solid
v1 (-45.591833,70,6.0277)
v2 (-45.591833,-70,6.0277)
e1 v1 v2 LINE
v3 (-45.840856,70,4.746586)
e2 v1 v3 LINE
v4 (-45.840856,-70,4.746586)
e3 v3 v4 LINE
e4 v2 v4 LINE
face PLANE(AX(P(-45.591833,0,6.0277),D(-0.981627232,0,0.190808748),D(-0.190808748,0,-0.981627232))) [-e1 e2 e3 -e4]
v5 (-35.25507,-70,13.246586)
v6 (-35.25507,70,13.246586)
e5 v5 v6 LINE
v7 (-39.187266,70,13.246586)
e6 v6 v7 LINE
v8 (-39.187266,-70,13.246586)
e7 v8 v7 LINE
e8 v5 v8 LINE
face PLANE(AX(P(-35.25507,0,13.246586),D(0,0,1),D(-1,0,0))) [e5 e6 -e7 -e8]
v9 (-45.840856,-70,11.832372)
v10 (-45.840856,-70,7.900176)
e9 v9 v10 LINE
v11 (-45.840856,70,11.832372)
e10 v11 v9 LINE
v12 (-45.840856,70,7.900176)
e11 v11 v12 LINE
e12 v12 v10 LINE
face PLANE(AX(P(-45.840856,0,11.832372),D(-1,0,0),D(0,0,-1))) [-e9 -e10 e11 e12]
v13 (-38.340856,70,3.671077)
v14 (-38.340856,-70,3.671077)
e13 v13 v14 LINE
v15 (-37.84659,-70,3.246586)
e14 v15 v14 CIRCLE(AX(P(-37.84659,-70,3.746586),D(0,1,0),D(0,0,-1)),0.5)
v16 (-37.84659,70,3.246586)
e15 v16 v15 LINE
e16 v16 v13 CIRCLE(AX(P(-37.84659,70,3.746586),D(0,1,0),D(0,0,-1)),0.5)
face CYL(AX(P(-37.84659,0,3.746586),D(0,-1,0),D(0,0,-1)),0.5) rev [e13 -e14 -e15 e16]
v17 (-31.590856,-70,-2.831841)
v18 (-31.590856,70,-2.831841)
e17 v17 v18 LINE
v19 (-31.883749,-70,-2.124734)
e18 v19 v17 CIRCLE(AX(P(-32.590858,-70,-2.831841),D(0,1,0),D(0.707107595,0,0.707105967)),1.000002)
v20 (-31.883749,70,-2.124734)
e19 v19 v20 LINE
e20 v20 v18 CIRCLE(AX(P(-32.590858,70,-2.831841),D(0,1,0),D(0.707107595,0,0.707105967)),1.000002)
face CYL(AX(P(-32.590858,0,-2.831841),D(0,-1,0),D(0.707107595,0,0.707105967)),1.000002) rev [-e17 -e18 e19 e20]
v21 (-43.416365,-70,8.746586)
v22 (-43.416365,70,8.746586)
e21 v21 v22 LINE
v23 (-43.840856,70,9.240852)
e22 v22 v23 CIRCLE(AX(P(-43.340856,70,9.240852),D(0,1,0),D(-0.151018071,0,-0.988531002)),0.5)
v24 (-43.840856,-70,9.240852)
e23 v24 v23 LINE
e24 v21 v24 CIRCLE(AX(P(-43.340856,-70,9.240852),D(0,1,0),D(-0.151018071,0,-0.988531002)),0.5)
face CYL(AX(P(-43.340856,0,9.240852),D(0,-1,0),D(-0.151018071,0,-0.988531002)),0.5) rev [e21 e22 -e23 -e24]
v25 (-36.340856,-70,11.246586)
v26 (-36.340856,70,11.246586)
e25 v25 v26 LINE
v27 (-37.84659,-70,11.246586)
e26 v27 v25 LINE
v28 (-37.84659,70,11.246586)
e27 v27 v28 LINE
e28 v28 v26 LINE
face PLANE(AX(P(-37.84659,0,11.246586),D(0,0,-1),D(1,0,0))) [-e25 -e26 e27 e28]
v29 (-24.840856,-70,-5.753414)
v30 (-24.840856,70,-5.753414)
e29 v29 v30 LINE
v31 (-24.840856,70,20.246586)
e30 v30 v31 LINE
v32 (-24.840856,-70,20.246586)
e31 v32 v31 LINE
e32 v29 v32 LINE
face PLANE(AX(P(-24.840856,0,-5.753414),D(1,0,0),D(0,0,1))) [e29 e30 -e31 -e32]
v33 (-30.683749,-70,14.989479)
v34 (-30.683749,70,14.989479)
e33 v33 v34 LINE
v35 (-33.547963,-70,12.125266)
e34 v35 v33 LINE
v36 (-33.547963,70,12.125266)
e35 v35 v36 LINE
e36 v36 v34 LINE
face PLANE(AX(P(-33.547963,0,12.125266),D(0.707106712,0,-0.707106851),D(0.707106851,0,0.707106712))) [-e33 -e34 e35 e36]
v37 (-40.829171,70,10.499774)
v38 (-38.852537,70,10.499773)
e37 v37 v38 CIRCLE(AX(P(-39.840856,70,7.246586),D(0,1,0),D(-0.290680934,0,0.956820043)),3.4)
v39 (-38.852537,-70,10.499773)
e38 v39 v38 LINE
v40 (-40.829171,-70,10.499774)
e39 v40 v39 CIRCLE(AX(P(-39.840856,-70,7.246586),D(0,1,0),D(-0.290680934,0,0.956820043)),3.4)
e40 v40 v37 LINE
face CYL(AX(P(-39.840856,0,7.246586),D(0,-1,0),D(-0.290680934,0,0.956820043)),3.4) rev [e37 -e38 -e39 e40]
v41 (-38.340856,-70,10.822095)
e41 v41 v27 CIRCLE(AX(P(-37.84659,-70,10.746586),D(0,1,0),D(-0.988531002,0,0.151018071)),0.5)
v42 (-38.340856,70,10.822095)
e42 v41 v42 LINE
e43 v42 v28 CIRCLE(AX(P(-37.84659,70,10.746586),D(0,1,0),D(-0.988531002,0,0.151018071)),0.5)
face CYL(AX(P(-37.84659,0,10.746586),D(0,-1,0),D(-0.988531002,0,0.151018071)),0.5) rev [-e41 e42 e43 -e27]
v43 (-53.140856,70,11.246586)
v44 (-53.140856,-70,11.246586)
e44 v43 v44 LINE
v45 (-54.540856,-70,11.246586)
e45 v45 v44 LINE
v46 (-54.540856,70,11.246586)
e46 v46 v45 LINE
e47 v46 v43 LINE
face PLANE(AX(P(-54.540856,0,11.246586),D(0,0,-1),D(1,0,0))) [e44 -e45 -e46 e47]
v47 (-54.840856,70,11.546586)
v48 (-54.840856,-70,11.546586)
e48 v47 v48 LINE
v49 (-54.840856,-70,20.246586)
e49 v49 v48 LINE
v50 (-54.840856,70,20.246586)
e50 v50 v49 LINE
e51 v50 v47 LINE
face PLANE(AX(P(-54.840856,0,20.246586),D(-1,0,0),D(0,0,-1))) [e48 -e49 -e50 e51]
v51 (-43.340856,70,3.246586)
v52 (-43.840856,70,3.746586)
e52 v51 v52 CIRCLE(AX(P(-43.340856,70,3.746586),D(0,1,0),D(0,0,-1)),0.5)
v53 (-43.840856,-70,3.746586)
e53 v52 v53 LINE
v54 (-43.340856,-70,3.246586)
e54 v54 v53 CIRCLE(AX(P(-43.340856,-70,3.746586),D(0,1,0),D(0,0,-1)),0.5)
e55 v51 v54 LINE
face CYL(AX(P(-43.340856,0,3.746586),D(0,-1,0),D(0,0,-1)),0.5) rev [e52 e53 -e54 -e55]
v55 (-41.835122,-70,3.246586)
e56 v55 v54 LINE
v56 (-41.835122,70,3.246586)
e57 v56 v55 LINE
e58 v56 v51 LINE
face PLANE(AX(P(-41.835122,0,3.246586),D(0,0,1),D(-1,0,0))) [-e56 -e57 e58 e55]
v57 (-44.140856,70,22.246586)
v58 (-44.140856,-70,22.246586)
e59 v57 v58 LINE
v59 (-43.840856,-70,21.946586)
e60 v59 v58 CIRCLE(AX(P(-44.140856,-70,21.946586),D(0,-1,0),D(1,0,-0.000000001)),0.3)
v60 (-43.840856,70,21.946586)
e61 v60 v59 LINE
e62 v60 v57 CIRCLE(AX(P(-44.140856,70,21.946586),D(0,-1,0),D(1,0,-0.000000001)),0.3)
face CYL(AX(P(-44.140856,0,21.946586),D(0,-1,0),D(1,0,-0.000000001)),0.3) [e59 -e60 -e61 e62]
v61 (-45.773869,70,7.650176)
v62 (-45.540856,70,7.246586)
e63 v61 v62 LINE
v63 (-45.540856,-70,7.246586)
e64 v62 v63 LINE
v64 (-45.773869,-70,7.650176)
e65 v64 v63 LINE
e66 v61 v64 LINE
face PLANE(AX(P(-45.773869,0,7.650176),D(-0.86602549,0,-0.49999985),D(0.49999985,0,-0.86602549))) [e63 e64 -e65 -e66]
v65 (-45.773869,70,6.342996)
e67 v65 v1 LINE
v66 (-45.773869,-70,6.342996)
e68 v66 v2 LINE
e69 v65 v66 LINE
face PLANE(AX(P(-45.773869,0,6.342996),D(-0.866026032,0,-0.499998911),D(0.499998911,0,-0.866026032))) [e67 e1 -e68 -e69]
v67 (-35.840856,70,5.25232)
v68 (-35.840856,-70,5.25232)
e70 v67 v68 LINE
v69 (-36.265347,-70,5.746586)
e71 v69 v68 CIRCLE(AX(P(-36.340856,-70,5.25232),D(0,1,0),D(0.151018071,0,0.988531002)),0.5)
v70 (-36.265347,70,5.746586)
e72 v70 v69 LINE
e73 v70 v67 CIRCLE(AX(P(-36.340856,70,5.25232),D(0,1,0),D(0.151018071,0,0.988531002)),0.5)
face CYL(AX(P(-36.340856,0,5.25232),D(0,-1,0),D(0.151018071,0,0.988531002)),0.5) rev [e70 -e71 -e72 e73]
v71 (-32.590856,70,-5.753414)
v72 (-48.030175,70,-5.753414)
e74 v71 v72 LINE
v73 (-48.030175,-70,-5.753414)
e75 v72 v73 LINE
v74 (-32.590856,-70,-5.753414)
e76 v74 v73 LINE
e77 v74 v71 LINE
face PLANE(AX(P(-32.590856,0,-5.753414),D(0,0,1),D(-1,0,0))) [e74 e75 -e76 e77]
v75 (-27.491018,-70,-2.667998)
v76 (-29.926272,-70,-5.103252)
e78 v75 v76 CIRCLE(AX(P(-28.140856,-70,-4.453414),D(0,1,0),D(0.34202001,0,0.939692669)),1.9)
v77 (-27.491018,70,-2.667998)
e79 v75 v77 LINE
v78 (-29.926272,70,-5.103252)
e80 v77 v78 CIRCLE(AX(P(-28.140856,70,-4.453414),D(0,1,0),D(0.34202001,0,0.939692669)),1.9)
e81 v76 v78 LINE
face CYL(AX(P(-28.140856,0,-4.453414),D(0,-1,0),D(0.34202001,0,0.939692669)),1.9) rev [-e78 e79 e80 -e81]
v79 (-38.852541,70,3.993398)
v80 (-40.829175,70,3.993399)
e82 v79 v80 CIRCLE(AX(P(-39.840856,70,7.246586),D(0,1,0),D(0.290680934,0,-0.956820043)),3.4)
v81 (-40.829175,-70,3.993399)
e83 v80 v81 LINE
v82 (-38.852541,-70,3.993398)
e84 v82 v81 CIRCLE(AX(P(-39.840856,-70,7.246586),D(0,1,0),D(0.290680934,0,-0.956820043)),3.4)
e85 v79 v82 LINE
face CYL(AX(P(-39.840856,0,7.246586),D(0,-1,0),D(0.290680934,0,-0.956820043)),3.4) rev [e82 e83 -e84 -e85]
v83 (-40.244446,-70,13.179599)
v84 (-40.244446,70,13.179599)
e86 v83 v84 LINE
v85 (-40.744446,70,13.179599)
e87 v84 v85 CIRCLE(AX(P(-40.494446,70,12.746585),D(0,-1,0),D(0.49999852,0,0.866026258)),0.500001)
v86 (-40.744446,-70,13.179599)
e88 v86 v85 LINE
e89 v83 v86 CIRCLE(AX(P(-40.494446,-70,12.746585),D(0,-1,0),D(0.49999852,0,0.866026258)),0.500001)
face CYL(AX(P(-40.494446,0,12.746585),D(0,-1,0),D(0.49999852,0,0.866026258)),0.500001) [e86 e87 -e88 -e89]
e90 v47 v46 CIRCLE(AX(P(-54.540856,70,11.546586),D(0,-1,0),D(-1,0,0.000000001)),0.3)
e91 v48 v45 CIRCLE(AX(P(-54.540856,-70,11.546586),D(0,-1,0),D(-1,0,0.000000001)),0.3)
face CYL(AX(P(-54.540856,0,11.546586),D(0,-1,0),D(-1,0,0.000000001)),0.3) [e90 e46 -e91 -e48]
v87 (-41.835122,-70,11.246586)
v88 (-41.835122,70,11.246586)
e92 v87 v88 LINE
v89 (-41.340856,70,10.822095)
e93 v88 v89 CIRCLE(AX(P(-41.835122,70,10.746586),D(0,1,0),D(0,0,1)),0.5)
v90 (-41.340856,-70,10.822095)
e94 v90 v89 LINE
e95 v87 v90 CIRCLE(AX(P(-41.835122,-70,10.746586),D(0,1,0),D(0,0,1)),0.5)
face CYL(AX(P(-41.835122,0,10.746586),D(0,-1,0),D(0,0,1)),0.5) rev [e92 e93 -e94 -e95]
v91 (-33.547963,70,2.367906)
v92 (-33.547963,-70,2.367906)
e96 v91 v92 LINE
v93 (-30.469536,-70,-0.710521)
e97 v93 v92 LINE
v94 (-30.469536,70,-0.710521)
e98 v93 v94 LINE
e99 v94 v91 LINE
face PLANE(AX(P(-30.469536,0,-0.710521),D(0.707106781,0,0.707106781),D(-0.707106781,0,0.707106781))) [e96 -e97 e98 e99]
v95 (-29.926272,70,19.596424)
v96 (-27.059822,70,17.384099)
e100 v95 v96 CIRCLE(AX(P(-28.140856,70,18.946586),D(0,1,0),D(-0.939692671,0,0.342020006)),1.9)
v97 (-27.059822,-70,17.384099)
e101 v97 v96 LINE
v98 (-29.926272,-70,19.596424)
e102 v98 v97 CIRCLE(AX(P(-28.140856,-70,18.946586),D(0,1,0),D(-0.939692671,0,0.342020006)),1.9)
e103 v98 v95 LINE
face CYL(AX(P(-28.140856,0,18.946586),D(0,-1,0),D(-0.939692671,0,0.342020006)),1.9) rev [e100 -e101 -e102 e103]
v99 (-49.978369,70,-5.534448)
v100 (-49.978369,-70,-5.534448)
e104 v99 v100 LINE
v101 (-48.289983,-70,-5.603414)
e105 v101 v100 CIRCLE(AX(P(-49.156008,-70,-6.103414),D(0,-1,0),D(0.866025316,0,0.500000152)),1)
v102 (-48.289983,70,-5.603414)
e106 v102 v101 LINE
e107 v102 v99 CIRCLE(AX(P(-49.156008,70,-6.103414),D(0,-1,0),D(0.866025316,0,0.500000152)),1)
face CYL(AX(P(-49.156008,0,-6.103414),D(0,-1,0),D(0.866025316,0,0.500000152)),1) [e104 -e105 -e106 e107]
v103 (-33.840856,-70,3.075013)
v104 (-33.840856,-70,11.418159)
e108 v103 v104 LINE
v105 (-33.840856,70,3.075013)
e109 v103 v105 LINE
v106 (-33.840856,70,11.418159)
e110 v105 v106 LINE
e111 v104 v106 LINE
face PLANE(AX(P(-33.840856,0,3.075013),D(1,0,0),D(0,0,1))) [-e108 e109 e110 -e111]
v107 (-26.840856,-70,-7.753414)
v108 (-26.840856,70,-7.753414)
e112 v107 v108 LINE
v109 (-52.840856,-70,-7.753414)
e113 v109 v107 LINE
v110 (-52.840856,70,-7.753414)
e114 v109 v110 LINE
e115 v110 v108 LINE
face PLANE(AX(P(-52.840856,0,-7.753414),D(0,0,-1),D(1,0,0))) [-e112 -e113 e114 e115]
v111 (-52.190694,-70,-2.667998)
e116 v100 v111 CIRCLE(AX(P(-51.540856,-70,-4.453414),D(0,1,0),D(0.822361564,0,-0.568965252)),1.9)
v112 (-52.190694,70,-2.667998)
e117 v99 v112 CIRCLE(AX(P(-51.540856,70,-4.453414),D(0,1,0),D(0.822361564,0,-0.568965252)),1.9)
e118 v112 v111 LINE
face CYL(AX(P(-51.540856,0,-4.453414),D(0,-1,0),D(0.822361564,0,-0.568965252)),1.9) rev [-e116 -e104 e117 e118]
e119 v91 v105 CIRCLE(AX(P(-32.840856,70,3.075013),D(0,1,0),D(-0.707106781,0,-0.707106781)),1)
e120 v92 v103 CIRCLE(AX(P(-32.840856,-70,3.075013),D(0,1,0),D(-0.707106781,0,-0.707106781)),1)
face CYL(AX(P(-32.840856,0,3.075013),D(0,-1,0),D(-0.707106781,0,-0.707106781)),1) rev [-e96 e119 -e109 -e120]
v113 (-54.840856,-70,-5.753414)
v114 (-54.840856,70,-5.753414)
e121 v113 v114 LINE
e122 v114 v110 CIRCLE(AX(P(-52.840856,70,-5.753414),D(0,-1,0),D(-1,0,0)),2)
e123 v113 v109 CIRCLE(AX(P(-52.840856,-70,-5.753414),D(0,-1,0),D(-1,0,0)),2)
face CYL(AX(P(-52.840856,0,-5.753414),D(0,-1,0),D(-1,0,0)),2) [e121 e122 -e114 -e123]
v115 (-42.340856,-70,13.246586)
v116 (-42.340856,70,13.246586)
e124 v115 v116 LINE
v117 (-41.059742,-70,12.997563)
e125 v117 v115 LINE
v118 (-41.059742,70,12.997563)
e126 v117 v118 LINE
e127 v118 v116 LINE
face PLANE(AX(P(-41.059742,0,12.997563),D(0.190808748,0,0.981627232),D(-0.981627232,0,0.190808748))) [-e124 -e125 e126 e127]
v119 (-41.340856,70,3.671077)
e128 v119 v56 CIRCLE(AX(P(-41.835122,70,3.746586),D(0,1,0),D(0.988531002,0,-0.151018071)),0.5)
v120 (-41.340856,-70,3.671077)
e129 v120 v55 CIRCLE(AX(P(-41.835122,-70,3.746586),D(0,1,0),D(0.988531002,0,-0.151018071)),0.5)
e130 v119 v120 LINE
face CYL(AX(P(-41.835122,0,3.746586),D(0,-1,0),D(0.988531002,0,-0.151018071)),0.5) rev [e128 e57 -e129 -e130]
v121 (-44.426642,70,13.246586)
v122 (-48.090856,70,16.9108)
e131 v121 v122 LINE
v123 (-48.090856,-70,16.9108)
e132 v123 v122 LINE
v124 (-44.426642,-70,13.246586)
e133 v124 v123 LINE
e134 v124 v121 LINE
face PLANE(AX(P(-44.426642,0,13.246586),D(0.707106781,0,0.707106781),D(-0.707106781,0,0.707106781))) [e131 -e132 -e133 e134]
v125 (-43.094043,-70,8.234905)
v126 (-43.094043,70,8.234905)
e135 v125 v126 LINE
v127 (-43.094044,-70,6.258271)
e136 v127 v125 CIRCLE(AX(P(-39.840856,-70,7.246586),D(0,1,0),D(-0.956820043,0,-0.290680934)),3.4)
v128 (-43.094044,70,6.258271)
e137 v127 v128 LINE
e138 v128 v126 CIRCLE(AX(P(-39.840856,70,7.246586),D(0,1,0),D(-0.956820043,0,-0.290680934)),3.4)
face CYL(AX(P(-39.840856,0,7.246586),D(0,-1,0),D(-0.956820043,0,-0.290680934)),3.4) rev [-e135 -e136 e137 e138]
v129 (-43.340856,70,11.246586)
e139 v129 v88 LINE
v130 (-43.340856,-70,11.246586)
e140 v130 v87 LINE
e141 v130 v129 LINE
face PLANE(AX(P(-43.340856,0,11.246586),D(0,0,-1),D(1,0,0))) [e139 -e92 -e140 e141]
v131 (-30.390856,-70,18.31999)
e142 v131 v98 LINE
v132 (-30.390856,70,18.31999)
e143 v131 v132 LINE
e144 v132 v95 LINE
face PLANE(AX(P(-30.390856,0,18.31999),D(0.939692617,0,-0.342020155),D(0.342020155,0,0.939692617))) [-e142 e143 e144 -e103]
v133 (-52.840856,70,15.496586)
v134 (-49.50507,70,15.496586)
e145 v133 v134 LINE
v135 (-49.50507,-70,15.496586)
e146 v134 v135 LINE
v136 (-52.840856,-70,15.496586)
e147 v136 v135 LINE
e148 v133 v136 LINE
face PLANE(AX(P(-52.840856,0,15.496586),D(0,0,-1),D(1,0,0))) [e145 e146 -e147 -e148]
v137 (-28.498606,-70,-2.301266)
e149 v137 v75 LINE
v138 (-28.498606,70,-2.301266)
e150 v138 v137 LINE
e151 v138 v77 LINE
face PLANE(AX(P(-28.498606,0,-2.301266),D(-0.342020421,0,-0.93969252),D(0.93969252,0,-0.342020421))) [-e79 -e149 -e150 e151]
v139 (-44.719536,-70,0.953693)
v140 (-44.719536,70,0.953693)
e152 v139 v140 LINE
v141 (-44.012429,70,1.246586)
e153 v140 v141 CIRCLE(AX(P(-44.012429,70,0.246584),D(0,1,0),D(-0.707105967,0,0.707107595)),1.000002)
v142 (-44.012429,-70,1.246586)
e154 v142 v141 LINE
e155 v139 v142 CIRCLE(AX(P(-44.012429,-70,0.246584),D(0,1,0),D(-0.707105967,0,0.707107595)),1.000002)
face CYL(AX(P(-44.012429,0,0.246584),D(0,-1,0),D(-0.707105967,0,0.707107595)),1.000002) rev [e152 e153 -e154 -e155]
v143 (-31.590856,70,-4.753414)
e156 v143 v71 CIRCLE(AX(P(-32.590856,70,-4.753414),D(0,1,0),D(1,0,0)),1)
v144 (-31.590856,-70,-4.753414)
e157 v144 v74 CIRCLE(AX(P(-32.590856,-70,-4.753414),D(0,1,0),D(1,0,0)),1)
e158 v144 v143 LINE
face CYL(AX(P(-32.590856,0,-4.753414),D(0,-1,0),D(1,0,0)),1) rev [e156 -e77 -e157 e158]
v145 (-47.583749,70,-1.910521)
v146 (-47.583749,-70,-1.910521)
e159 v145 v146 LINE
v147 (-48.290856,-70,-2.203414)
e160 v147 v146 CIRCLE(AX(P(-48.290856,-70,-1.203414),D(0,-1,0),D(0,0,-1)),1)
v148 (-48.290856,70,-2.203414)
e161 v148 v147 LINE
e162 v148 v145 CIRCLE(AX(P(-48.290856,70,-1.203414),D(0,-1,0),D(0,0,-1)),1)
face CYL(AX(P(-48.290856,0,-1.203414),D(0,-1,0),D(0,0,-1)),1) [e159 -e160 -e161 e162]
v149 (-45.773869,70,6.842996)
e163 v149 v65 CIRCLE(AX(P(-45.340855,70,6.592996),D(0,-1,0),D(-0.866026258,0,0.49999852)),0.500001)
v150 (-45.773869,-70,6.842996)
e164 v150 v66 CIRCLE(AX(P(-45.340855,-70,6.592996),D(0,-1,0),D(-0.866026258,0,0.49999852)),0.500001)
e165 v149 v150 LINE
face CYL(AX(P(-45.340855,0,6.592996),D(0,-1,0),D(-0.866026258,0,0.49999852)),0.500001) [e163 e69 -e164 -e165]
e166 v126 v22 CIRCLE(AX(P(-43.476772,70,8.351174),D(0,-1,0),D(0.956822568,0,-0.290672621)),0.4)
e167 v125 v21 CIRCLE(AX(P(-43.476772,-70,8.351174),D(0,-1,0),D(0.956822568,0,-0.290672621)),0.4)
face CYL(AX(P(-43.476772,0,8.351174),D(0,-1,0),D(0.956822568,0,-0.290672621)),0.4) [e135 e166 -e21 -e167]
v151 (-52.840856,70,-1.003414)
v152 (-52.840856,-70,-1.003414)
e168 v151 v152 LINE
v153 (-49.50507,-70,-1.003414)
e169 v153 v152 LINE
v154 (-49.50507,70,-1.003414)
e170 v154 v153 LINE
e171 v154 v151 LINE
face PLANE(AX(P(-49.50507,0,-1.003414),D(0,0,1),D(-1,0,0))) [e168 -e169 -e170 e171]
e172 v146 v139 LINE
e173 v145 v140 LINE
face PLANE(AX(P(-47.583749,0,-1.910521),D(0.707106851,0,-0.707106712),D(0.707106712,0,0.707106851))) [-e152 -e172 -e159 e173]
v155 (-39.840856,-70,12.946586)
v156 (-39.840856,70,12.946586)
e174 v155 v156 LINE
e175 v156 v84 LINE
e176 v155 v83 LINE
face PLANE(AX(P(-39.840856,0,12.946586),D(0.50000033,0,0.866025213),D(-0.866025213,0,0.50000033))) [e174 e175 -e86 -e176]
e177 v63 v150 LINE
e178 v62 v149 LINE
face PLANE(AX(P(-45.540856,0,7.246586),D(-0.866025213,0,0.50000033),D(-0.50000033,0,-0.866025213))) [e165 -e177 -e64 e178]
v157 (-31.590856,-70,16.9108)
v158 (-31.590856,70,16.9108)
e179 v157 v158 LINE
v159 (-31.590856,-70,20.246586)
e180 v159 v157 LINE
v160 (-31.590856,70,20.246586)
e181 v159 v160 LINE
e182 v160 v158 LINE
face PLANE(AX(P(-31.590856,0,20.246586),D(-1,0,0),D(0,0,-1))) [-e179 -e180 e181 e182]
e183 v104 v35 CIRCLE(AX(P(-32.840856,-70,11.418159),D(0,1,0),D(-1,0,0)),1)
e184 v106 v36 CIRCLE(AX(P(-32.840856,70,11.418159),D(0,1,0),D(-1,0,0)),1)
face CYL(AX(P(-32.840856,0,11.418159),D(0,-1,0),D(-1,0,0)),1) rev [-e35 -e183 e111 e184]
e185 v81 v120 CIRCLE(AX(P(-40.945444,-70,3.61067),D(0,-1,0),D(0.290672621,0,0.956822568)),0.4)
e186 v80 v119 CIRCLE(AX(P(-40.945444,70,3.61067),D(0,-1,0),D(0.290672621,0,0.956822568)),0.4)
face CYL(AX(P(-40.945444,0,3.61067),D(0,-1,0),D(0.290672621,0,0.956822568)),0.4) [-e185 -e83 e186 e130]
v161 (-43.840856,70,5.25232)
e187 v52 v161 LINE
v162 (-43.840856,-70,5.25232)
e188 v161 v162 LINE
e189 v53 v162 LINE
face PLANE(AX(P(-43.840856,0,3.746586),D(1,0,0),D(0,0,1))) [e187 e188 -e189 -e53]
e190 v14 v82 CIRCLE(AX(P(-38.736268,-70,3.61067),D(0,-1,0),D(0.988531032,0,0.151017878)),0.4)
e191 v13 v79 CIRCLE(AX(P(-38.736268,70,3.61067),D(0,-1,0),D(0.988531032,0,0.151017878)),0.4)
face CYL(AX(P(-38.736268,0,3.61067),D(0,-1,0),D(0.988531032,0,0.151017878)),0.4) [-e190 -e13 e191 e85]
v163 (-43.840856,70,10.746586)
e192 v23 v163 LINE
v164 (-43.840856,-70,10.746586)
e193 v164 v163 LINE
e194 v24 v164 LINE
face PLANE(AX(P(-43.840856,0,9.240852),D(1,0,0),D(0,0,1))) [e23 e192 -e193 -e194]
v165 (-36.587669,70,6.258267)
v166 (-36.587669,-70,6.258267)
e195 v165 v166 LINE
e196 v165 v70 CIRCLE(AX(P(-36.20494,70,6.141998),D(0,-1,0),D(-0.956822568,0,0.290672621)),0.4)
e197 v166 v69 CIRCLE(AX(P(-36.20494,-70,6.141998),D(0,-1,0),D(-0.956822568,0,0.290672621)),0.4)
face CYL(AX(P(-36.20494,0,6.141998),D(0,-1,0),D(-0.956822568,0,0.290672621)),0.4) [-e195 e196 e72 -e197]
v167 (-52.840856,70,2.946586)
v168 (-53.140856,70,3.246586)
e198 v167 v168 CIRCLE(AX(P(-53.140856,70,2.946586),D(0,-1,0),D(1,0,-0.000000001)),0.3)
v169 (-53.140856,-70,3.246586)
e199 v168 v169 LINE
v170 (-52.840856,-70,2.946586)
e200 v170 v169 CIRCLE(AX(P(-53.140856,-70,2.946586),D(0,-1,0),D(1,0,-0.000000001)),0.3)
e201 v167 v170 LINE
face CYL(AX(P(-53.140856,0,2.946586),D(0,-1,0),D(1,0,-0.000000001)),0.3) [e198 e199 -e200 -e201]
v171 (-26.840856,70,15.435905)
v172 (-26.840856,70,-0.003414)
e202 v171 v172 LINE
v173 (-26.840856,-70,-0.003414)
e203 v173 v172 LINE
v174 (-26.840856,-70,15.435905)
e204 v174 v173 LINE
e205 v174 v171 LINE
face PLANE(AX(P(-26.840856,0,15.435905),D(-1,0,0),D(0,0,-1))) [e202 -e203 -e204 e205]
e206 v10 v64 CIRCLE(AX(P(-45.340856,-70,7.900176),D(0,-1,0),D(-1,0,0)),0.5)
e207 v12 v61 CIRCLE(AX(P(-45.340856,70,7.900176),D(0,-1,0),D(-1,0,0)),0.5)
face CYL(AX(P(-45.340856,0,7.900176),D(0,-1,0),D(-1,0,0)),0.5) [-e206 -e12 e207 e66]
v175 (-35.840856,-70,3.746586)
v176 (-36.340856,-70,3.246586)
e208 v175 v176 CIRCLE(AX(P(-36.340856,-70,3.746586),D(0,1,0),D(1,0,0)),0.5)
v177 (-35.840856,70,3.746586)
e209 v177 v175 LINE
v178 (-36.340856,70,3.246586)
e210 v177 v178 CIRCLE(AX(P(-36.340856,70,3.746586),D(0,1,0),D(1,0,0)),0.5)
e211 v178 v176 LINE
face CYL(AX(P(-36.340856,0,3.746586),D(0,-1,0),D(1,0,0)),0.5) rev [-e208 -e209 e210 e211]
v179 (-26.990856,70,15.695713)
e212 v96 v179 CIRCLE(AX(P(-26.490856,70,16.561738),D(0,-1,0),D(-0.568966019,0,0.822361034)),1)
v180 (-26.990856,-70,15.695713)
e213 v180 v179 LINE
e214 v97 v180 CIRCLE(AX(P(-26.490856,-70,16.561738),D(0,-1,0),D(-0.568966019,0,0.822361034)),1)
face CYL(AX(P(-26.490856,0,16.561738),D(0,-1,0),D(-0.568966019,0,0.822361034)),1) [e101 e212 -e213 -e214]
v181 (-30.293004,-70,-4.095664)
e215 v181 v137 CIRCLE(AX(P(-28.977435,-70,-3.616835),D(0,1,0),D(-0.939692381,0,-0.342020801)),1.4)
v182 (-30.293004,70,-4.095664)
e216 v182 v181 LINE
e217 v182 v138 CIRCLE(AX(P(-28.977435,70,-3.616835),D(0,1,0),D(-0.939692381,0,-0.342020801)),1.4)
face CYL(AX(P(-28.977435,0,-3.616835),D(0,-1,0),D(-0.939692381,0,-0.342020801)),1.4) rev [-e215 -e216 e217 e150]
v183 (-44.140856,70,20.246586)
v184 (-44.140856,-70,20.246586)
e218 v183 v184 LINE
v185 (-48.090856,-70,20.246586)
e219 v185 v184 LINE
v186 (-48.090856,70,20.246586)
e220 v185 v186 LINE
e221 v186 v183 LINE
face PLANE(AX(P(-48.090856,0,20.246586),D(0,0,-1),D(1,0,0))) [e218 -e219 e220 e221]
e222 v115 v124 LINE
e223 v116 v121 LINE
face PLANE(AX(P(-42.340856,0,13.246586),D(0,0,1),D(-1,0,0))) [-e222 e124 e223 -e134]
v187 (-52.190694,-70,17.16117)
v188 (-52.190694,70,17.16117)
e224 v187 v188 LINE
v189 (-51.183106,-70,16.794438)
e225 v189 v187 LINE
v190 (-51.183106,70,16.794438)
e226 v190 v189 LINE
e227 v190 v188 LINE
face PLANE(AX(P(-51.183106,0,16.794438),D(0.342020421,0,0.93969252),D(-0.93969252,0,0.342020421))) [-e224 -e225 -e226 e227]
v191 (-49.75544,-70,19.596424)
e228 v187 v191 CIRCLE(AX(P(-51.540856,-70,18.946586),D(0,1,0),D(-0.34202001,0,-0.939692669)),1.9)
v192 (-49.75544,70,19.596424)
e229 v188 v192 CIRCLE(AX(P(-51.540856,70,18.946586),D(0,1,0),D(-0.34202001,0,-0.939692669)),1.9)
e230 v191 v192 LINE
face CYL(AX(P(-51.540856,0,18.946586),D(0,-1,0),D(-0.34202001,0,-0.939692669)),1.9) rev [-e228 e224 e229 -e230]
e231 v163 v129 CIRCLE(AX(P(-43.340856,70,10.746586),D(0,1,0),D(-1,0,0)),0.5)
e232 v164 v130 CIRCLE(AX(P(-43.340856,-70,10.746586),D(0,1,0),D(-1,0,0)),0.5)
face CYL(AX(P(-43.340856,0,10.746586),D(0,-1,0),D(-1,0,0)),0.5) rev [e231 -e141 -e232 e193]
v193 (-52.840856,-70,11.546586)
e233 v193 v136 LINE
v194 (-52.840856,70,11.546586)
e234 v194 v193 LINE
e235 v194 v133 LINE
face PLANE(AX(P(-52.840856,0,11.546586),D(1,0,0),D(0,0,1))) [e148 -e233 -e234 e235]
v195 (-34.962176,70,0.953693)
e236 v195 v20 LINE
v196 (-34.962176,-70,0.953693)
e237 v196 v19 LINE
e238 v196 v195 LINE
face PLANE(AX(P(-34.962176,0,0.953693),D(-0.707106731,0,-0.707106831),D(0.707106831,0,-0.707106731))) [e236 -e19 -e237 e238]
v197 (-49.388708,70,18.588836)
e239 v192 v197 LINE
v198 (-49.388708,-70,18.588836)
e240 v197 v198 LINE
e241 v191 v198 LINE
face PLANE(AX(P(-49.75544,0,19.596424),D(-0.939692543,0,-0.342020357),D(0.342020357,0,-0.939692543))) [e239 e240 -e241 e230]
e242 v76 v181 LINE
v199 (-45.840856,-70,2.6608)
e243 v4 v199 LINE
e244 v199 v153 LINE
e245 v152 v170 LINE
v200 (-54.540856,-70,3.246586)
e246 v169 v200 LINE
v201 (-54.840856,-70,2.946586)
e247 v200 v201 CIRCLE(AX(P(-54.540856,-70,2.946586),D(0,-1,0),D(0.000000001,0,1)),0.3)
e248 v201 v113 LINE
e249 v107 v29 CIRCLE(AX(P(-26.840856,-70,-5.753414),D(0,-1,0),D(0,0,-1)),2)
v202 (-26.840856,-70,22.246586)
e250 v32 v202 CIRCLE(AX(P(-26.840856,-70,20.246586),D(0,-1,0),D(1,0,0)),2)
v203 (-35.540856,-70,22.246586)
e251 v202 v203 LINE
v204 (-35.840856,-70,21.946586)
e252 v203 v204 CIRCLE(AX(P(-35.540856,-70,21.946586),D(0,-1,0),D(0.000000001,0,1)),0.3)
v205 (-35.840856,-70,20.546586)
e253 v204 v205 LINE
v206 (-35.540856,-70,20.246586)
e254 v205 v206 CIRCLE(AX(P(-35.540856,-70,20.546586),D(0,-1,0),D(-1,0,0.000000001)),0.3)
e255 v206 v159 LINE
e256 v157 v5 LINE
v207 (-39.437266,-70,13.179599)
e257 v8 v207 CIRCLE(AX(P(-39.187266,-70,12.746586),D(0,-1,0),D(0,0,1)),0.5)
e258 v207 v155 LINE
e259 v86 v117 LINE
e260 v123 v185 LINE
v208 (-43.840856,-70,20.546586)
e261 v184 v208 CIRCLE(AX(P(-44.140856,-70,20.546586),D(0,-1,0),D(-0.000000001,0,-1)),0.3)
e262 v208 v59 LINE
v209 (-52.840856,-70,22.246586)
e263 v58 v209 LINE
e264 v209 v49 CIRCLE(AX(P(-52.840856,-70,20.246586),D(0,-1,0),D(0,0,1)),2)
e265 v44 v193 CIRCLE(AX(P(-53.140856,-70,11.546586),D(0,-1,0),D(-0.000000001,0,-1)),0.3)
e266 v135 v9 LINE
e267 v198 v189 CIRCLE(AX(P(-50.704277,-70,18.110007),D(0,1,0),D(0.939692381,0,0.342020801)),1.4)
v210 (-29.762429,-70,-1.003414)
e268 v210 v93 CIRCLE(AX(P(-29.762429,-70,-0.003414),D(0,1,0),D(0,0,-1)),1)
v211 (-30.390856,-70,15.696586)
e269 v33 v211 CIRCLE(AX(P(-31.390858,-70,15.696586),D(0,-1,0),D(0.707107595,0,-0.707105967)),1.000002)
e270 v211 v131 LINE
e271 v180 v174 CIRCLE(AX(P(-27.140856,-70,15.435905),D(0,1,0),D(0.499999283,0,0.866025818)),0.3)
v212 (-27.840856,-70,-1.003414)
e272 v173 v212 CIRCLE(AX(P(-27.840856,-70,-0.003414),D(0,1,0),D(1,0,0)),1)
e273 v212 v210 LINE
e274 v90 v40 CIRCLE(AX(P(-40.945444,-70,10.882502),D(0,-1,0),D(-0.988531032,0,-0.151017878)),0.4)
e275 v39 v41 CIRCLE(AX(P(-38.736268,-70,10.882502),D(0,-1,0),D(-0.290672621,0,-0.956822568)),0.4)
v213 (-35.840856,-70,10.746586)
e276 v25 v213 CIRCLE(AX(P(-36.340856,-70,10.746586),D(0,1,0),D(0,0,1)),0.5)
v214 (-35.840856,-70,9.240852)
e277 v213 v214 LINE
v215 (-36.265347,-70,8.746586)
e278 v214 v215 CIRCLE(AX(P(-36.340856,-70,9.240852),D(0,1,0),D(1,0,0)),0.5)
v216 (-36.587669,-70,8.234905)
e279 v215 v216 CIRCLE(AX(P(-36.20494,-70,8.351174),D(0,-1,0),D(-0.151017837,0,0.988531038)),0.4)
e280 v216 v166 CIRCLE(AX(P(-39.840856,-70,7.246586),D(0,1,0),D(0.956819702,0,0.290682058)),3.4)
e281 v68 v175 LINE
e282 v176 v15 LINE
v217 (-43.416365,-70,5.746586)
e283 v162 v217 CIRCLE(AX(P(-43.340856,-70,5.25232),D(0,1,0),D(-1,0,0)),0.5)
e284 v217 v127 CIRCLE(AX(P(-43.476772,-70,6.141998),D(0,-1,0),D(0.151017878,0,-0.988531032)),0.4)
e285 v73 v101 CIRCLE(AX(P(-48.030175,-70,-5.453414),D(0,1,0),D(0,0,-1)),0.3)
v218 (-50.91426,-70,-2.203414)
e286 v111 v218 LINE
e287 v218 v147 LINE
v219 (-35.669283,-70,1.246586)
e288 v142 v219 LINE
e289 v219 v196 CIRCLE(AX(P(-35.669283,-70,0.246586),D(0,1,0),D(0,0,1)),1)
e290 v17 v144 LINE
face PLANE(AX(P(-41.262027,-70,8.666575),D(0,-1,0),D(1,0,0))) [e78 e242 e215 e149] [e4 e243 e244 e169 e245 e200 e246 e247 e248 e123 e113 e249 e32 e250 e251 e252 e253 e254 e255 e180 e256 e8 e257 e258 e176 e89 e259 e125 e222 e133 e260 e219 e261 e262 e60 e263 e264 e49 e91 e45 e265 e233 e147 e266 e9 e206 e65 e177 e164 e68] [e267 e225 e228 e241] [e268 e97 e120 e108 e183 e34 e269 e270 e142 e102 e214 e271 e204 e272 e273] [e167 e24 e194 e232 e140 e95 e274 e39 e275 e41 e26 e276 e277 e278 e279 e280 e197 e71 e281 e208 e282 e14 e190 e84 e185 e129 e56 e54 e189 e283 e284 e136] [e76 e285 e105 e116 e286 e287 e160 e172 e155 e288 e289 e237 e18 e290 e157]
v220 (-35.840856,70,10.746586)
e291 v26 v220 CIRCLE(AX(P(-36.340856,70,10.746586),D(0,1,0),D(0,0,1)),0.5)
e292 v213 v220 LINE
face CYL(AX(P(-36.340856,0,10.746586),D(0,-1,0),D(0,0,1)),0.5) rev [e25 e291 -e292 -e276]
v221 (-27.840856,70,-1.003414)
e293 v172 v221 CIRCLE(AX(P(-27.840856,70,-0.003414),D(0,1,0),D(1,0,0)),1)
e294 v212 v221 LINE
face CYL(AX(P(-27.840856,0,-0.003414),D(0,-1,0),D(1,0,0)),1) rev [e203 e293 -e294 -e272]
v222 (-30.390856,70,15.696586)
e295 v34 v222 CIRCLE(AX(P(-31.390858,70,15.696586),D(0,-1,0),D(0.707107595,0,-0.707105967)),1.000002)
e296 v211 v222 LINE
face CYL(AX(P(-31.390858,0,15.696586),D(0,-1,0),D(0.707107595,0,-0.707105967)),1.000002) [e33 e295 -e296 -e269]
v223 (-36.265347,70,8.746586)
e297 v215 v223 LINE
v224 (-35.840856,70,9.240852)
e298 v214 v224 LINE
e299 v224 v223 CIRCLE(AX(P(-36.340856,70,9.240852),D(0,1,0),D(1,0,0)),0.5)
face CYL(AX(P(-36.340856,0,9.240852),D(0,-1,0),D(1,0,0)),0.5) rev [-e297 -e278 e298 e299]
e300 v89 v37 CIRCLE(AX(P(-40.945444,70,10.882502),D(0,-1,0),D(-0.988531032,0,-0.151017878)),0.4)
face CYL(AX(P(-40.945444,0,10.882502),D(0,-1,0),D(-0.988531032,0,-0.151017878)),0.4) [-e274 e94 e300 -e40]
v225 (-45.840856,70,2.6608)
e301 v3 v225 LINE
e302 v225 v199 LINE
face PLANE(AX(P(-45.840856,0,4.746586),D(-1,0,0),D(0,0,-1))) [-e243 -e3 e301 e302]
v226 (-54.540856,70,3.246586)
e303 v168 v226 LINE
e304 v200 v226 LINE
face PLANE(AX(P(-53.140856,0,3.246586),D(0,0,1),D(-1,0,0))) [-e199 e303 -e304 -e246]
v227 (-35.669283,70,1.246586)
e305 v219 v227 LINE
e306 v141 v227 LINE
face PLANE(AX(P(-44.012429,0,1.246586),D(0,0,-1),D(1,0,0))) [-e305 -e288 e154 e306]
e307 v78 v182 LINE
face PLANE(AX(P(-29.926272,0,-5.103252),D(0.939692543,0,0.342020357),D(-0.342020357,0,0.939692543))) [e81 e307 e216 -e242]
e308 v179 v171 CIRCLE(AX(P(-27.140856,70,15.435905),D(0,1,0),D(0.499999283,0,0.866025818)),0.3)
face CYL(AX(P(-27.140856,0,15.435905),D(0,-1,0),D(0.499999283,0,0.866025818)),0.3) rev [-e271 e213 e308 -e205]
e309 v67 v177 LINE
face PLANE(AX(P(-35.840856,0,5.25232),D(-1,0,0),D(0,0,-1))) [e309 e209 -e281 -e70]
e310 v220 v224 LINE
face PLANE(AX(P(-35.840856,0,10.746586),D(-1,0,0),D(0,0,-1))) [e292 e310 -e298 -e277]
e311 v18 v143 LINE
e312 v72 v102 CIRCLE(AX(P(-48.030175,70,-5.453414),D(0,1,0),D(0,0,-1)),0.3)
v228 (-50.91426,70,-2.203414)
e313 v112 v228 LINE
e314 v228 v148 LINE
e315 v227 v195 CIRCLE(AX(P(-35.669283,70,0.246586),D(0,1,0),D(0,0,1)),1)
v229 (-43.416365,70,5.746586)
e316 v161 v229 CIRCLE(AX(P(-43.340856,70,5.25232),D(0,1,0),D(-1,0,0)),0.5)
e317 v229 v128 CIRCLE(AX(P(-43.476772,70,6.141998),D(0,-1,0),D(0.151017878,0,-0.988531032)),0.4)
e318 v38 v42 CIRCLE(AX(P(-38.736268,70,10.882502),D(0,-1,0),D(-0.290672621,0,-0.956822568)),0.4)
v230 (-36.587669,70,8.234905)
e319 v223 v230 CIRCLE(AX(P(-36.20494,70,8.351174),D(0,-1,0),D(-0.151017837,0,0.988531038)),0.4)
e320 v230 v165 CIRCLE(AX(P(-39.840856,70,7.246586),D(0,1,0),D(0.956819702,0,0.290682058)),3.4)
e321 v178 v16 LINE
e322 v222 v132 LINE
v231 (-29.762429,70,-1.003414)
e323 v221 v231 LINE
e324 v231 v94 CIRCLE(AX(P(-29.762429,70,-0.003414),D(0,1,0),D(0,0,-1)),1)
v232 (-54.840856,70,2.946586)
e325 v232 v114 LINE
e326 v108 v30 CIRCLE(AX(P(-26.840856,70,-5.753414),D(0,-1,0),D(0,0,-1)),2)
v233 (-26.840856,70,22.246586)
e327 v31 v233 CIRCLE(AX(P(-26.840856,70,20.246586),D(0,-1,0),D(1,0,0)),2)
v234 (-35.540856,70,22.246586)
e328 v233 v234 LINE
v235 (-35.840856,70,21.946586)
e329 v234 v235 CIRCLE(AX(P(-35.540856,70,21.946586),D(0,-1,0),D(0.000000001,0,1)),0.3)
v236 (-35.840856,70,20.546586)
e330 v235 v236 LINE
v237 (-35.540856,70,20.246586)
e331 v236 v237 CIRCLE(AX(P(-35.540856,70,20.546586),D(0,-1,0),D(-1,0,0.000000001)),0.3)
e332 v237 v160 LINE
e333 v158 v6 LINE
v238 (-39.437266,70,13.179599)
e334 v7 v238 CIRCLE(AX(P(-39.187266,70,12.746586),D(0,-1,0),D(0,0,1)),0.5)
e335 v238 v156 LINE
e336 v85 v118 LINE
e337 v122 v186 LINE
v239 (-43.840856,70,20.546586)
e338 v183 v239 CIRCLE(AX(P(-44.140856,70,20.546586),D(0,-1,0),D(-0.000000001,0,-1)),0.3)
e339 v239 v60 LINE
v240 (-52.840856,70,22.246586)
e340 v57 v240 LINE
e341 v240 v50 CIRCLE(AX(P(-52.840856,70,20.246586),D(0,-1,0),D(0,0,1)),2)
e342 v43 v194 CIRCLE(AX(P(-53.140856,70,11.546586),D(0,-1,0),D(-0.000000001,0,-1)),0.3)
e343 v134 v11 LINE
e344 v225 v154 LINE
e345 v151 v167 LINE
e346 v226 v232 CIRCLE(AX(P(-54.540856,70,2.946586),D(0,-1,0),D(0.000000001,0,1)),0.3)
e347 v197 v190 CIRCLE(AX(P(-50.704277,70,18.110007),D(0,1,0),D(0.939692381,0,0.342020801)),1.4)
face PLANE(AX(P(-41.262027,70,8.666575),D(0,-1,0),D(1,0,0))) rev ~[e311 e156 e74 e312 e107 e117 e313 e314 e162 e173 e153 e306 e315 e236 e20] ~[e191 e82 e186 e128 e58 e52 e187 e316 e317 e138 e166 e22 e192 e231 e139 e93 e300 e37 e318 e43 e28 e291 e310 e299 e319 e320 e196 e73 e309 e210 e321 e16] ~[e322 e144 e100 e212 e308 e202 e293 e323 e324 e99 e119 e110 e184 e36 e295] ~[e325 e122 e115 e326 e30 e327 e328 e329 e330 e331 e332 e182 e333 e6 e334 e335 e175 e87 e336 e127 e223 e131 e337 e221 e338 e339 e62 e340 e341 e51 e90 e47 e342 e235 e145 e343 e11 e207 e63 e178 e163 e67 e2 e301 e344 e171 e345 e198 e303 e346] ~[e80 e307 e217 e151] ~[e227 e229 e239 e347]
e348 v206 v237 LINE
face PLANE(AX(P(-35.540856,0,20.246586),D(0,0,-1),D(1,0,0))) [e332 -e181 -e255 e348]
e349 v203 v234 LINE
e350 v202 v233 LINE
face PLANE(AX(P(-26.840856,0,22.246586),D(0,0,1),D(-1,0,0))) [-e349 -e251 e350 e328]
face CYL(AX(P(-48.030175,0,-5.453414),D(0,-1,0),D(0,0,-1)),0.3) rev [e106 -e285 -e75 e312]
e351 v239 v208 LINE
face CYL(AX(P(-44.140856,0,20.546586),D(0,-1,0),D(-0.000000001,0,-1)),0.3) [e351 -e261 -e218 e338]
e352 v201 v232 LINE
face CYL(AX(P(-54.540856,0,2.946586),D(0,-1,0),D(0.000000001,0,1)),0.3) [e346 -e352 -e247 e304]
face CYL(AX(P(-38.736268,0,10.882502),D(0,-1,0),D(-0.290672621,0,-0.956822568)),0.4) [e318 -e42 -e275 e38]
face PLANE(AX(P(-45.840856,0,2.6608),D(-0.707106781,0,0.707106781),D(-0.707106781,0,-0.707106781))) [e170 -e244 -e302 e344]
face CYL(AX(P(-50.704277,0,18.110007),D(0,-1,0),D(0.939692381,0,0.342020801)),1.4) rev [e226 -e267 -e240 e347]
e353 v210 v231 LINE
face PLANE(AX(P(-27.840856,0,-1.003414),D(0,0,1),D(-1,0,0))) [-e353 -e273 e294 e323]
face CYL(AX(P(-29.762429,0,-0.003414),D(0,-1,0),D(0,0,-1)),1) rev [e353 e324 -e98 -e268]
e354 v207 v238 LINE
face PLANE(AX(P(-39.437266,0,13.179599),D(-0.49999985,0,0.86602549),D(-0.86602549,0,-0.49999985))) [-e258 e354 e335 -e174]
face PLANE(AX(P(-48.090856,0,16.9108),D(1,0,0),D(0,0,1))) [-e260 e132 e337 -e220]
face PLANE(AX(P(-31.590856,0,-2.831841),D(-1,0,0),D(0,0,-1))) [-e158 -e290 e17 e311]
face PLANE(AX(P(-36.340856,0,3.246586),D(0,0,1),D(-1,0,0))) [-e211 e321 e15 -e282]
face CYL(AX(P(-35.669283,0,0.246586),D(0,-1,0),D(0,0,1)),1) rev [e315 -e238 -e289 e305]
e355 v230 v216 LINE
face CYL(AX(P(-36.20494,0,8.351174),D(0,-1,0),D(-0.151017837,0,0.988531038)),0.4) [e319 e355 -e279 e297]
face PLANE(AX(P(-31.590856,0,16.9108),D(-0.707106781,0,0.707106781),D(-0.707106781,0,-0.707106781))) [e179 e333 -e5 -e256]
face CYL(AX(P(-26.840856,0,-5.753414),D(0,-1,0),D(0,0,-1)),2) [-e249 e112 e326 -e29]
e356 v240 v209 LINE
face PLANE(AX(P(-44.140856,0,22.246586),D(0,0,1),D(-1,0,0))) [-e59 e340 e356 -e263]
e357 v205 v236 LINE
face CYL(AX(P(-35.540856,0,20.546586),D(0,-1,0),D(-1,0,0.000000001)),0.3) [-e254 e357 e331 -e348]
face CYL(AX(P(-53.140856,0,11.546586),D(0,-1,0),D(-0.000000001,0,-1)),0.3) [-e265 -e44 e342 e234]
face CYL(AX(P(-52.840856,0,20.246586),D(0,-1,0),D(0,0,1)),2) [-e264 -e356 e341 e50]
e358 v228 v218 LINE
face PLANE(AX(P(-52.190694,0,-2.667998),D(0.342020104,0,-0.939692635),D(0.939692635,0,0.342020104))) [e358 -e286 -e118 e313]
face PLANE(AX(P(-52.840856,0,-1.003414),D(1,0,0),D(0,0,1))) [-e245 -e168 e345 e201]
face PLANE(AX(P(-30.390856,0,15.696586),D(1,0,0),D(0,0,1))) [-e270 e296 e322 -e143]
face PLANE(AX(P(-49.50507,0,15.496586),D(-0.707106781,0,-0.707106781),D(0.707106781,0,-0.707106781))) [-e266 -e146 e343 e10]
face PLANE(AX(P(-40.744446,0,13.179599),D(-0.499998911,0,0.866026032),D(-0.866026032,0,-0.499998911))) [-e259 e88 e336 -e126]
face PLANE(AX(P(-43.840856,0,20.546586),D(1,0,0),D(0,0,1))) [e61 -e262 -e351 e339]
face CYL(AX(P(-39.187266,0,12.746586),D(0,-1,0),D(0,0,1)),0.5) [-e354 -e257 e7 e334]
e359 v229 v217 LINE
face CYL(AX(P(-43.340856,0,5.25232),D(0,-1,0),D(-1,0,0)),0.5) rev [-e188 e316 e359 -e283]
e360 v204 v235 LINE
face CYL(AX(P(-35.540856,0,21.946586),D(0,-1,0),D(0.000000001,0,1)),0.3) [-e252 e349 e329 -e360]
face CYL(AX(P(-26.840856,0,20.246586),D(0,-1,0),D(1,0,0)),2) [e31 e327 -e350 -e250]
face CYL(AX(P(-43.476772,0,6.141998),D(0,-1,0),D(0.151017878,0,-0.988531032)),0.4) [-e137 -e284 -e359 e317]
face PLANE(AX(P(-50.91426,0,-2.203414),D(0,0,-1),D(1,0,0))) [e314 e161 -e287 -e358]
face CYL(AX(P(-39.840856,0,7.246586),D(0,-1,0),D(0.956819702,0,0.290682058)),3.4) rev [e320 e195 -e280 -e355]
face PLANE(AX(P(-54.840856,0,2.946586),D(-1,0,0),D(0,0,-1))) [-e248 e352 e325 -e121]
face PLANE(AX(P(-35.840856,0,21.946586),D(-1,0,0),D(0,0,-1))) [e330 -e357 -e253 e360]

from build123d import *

# Parameters (mm, degrees)
F2_DEPTH = 70


# Not quite as in the source:
# - ends of sketch curves that miss each other by under 0.0002 mm in the source are joined


with BuildPart() as f2:
    # F1 (on Front) → F2 (new body, symmetric)
    with BuildSketch(Plane.XZ):
        with BuildLine():
            Line((-48.090856, 20.246586), (-44.140856, 20.246586))
            ThreePointArc((-44.140856, 20.246586), (-43.9287239656, 20.3344539656), (-43.840856, 20.546586))
            Line((-43.840856, 20.546586), (-43.840856, 21.946586))
            ThreePointArc((-43.840856, 21.946586), (-43.9287239656, 22.1587180344), (-44.140856, 22.246586))
            Line((-44.140856, 22.246586), (-52.840856, 22.246586))
            ThreePointArc((-52.840856, 22.246586), (-54.2550695624, 21.6607995624), (-54.840856, 20.246586))
            Line((-54.840856, 20.246586), (-54.840856, 11.546586))
            ThreePointArc((-54.840856, 11.546586), (-54.7529880344, 11.3344539656), (-54.540856, 11.246586))
            Line((-54.540856, 11.246586), (-53.140856, 11.246586))
            ThreePointArc((-53.140856, 11.246586), (-52.9287239656, 11.3344539656), (-52.840856, 11.546586))
            Line((-52.840856, 11.546586), (-52.840856, 15.496586))
            Line((-52.840856, 15.496586), (-49.50507, 15.496586))
            Line((-49.50507, 15.496586), (-45.840856, 11.832372))
            Line((-45.840856, 11.832372), (-45.840856, 7.900176))
            ThreePointArc((-45.840856, 7.900176), (-45.8238189324, 7.7707665494), (-45.7738687764, 7.6501761291))
            Line((-45.7738687764, 7.6501761291), (-45.540856, 7.246586))
            Line((-45.540856, 7.246586), (-45.773869, 6.842996))
            ThreePointArc((-45.773869, 6.842996), (-45.840856, 6.592996), (-45.7738687764, 6.3429961291))
            Line((-45.7738687764, 6.3429961291), (-45.591833, 6.0277))
            Line((-45.591833, 6.0277), (-45.840856, 4.746586))
            Line((-45.840856, 4.746586), (-45.840856, 2.6608))
            Line((-45.840856, 2.6608), (-49.50507, -1.003414))
            Line((-49.50507, -1.003414), (-52.840856, -1.003414))
            Line((-52.840856, -1.003414), (-52.840856, 2.946586))
            ThreePointArc((-52.840856, 2.946586), (-52.9287239656, 3.1587180344), (-53.140856, 3.246586))
            Line((-53.140856, 3.246586), (-54.540856, 3.246586))
            ThreePointArc((-54.540856, 3.246586), (-54.7529880344, 3.1587180344), (-54.840856, 2.946586))
            Line((-54.840856, 2.946586), (-54.840856, -5.753414))
            ThreePointArc((-54.840856, -5.753414), (-54.2550695624, -7.1676275624), (-52.840856, -7.753414))
            Line((-52.840856, -7.753414), (-26.840856, -7.753414))
            ThreePointArc((-26.840856, -7.753414), (-25.4266424376, -7.1676275624), (-24.840856, -5.753414))
            Line((-24.840856, -5.753414), (-24.840856, 20.246586))
            ThreePointArc((-24.840856, 20.246586), (-25.4266424376, 21.6607995624), (-26.840856, 22.246586))
            Line((-26.840856, 22.246586), (-35.540856, 22.246586))
            ThreePointArc((-35.540856, 22.246586), (-35.7529880344, 22.1587180344), (-35.840856, 21.946586))
            Line((-35.840856, 21.946586), (-35.840856, 20.546586))
            ThreePointArc((-35.840856, 20.546586), (-35.7529880344, 20.3344539656), (-35.540856, 20.246586))
            Line((-35.540856, 20.246586), (-31.590856, 20.246586))
            Line((-31.590856, 20.246586), (-31.590856, 16.9108))
            Line((-31.590856, 16.9108), (-35.25507, 13.246586))
            Line((-35.25507, 13.246586), (-39.187266, 13.246586))
            ThreePointArc((-39.187266, 13.246586), (-39.3166754506, 13.2295489324), (-39.4372658709, 13.1795987764))
            Line((-39.4372658709, 13.1795987764), (-39.840856, 12.946586))
            Line((-39.840856, 12.946586), (-40.244446, 13.179599))
            ThreePointArc((-40.244446, 13.179599), (-40.494446, 13.246586), (-40.7444458709, 13.1795987764))
            Line((-40.7444458709, 13.1795987764), (-41.059742, 12.997563))
            Line((-41.059742, 12.997563), (-42.340856, 13.246586))
            Line((-42.340856, 13.246586), (-44.426642, 13.246586))
            Line((-44.426642, 13.246586), (-48.090856, 16.9108))
            Line((-48.090856, 16.9108), (-48.090856, 20.246586))
        make_face()
        with BuildLine():
            ThreePointArc((-48.030175, -5.753414), (-48.180175082, -5.7132215738), (-48.2899827159, -5.6034138359))
            ThreePointArc((-48.2899827159, -5.6034138359), (-49.1151948384, -5.1042472042), (-49.9783690315, -5.5344479782))
            ThreePointArc((-49.9783690315, -5.5344479782), (-53.0449723505, -5.6142903949), (-52.1906940253, -2.6679979306))
            Line((-52.1906940253, -2.6679979306), (-50.91426, -2.203414))
            Line((-50.91426, -2.203414), (-48.290856, -2.203414))
            ThreePointArc((-48.290856, -2.203414), (-47.9081725676, -2.1272935325), (-47.5837492188, -1.9105207812))
            Line((-47.5837492188, -1.9105207812), (-44.719536, 0.953693))
            ThreePointArc((-44.719536, 0.953693), (-44.3951124324, 1.1704655325), (-44.012429, 1.246586))
            Line((-44.012429, 1.246586), (-35.669283, 1.246586))
            ThreePointArc((-35.669283, 1.246586), (-35.2865995676, 1.1704655325), (-34.9621762188, 0.9536927812))
            Line((-34.9621762188, 0.9536927812), (-31.883749, -2.124734))
            ThreePointArc((-31.883749, -2.124734), (-31.6669764675, -2.4491575676), (-31.590856, -2.831841))
            Line((-31.590856, -2.831841), (-31.590856, -4.753414))
            ThreePointArc((-31.590856, -4.753414), (-31.8837492188, -5.4605207812), (-32.590856, -5.753414))
            Line((-32.590856, -5.753414), (-48.030175, -5.753414))
        make_face(mode=Mode.SUBTRACT)
        with BuildLine():
            ThreePointArc((-30.2930043339, -4.0956641215), (-29.9673844937, -2.6268855063), (-28.4986058785, -2.3012656661))
            Line((-28.4986058785, -2.3012656661), (-27.491018, -2.667998))
            ThreePointArc((-27.491018, -2.667998), (-26.7973531157, -5.7969168843), (-29.9262720694, -5.1032520253))
            Line((-29.9262720694, -5.1032520253), (-30.2930043339, -4.0956641215))
        make_face(mode=Mode.SUBTRACT)
        with BuildLine():
            ThreePointArc((-36.5876690145, 8.2349049956), (-36.440856, 7.246586), (-36.5876690145, 6.2582670044))
            ThreePointArc((-36.5876690145, 6.2582670044), (-36.5433888407, 5.9288023569), (-36.2653470651, 5.7465855742))
            ThreePointArc((-36.2653470651, 5.7465855742), (-35.9615444769, 5.5780848975), (-35.840856, 5.25232))
            Line((-35.840856, 5.25232), (-35.840856, 3.746586))
            ThreePointArc((-35.840856, 3.746586), (-35.9873026094, 3.3930326094), (-36.340856, 3.246586))
            Line((-36.340856, 3.246586), (-37.84659, 3.246586))
            ThreePointArc((-37.84659, 3.246586), (-38.1723548975, 3.3672744769), (-38.3408555178, 3.6710770737))
            ThreePointArc((-38.3408555178, 3.6710770737), (-38.5230723569, 3.9491188407), (-38.8525409519, 3.9933978415))
            ThreePointArc((-38.8525409519, 3.9933978415), (-39.840856, 3.846586), (-40.8291749956, 3.9933990145))
            ThreePointArc((-40.8291749956, 3.9933990145), (-41.1586396431, 3.9491188407), (-41.3408564258, 3.6710770651))
            ThreePointArc((-41.3408564258, 3.6710770651), (-41.5093571025, 3.3672744769), (-41.835122, 3.246586))
            Line((-41.835122, 3.246586), (-43.340856, 3.246586))
            ThreePointArc((-43.340856, 3.246586), (-43.6944093906, 3.3930326094), (-43.840856, 3.746586))
            Line((-43.840856, 3.746586), (-43.840856, 5.25232))
            ThreePointArc((-43.840856, 5.25232), (-43.7201675231, 5.5780848975), (-43.4163649263, 5.7465855178))
            ThreePointArc((-43.4163649263, 5.7465855178), (-43.1383231593, 5.9288023569), (-43.0940441585, 6.2582709519))
            ThreePointArc((-43.0940441585, 6.2582709519), (-43.240856, 7.246586), (-43.0940429855, 8.2349049956))
            ThreePointArc((-43.0940429855, 8.2349049956), (-43.1383231593, 8.5643696431), (-43.4163649349, 8.7465864258))
            ThreePointArc((-43.4163649349, 8.7465864258), (-43.7201675231, 8.9150871025), (-43.840856, 9.240852))
            Line((-43.840856, 9.240852), (-43.840856, 10.746586))
            ThreePointArc((-43.840856, 10.746586), (-43.6944093906, 11.1001393906), (-43.340856, 11.246586))
            Line((-43.340856, 11.246586), (-41.835122, 11.246586))
            ThreePointArc((-41.835122, 11.246586), (-41.5093571025, 11.1258975231), (-41.3408564822, 10.8220949263))
            ThreePointArc((-41.3408564822, 10.8220949263), (-41.1586396431, 10.5440531593), (-40.8291710481, 10.4997741585))
            ThreePointArc((-40.8291710481, 10.4997741585), (-39.840856, 10.646586), (-38.8525370044, 10.4997729855))
            ThreePointArc((-38.8525370044, 10.4997729855), (-38.5230723569, 10.5440531593), (-38.3408555742, 10.8220949349))
            ThreePointArc((-38.3408555742, 10.8220949349), (-38.1723548975, 11.1258975231), (-37.84659, 11.246586))
            Line((-37.84659, 11.246586), (-36.340856, 11.246586))
            ThreePointArc((-36.340856, 11.246586), (-35.9873026094, 11.1001393906), (-35.840856, 10.746586))
            Line((-35.840856, 10.746586), (-35.840856, 9.240852))
            ThreePointArc((-35.840856, 9.240852), (-35.9615444769, 8.9150871025), (-36.2653470737, 8.7465864822))
            ThreePointArc((-36.2653470737, 8.7465864822), (-36.5433888407, 8.5643696431), (-36.5876690145, 8.2349049956))
        make_face(mode=Mode.SUBTRACT)
        with BuildLine():
            ThreePointArc((-49.3887076661, 18.5888361215), (-49.7143275063, 17.1200575063), (-51.1831061215, 16.7944376661))
            Line((-51.1831061215, 16.7944376661), (-52.190694, 17.16117))
            ThreePointArc((-52.190694, 17.16117), (-52.8843588843, 20.2900888843), (-49.7554399306, 19.5964240253))
            Line((-49.7554399306, 19.5964240253), (-49.3887076661, 18.5888361215))
        make_face(mode=Mode.SUBTRACT)
        with BuildLine():
            ThreePointArc((-33.5479627812, 2.3679062188), (-33.7647355325, 2.6923295676), (-33.840856, 3.075013))
            Line((-33.840856, 3.075013), (-33.840856, 11.418159))
            ThreePointArc((-33.840856, 11.418159), (-33.7647355325, 11.8008424324), (-33.5479627812, 12.1252657812))
            Line((-33.5479627812, 12.1252657812), (-30.683749, 14.989479))
            ThreePointArc((-30.683749, 14.989479), (-30.4669764675, 15.3139025676), (-30.390856, 15.696586))
            Line((-30.390856, 15.696586), (-30.390856, 18.31999))
            Line((-30.390856, 18.31999), (-29.926272, 19.596424))
            ThreePointArc((-29.926272, 19.596424), (-26.9799796051, 20.4507023505), (-27.0598220201, 17.3840990291))
            ThreePointArc((-27.0598220201, 17.3840990291), (-27.4900227958, 16.5209248384), (-26.9908561748, 15.6957126972))
            ThreePointArc((-26.9908561748, 15.6957126972), (-26.8810484262, 15.585905082), (-26.840856, 15.435905))
            Line((-26.840856, 15.435905), (-26.840856, -0.003414))
            ThreePointArc((-26.840856, -0.003414), (-27.1337492188, -0.7105207812), (-27.840856, -1.003414))
            Line((-27.840856, -1.003414), (-29.762429, -1.003414))
            ThreePointArc((-29.762429, -1.003414), (-30.1451124324, -0.9272935325), (-30.4695357812, -0.7105207812))
            Line((-30.4695357812, -0.7105207812), (-33.5479627812, 2.3679062188))
        make_face(mode=Mode.SUBTRACT)
    extrude(amount=F2_DEPTH, both=True)


solid = f2.part
